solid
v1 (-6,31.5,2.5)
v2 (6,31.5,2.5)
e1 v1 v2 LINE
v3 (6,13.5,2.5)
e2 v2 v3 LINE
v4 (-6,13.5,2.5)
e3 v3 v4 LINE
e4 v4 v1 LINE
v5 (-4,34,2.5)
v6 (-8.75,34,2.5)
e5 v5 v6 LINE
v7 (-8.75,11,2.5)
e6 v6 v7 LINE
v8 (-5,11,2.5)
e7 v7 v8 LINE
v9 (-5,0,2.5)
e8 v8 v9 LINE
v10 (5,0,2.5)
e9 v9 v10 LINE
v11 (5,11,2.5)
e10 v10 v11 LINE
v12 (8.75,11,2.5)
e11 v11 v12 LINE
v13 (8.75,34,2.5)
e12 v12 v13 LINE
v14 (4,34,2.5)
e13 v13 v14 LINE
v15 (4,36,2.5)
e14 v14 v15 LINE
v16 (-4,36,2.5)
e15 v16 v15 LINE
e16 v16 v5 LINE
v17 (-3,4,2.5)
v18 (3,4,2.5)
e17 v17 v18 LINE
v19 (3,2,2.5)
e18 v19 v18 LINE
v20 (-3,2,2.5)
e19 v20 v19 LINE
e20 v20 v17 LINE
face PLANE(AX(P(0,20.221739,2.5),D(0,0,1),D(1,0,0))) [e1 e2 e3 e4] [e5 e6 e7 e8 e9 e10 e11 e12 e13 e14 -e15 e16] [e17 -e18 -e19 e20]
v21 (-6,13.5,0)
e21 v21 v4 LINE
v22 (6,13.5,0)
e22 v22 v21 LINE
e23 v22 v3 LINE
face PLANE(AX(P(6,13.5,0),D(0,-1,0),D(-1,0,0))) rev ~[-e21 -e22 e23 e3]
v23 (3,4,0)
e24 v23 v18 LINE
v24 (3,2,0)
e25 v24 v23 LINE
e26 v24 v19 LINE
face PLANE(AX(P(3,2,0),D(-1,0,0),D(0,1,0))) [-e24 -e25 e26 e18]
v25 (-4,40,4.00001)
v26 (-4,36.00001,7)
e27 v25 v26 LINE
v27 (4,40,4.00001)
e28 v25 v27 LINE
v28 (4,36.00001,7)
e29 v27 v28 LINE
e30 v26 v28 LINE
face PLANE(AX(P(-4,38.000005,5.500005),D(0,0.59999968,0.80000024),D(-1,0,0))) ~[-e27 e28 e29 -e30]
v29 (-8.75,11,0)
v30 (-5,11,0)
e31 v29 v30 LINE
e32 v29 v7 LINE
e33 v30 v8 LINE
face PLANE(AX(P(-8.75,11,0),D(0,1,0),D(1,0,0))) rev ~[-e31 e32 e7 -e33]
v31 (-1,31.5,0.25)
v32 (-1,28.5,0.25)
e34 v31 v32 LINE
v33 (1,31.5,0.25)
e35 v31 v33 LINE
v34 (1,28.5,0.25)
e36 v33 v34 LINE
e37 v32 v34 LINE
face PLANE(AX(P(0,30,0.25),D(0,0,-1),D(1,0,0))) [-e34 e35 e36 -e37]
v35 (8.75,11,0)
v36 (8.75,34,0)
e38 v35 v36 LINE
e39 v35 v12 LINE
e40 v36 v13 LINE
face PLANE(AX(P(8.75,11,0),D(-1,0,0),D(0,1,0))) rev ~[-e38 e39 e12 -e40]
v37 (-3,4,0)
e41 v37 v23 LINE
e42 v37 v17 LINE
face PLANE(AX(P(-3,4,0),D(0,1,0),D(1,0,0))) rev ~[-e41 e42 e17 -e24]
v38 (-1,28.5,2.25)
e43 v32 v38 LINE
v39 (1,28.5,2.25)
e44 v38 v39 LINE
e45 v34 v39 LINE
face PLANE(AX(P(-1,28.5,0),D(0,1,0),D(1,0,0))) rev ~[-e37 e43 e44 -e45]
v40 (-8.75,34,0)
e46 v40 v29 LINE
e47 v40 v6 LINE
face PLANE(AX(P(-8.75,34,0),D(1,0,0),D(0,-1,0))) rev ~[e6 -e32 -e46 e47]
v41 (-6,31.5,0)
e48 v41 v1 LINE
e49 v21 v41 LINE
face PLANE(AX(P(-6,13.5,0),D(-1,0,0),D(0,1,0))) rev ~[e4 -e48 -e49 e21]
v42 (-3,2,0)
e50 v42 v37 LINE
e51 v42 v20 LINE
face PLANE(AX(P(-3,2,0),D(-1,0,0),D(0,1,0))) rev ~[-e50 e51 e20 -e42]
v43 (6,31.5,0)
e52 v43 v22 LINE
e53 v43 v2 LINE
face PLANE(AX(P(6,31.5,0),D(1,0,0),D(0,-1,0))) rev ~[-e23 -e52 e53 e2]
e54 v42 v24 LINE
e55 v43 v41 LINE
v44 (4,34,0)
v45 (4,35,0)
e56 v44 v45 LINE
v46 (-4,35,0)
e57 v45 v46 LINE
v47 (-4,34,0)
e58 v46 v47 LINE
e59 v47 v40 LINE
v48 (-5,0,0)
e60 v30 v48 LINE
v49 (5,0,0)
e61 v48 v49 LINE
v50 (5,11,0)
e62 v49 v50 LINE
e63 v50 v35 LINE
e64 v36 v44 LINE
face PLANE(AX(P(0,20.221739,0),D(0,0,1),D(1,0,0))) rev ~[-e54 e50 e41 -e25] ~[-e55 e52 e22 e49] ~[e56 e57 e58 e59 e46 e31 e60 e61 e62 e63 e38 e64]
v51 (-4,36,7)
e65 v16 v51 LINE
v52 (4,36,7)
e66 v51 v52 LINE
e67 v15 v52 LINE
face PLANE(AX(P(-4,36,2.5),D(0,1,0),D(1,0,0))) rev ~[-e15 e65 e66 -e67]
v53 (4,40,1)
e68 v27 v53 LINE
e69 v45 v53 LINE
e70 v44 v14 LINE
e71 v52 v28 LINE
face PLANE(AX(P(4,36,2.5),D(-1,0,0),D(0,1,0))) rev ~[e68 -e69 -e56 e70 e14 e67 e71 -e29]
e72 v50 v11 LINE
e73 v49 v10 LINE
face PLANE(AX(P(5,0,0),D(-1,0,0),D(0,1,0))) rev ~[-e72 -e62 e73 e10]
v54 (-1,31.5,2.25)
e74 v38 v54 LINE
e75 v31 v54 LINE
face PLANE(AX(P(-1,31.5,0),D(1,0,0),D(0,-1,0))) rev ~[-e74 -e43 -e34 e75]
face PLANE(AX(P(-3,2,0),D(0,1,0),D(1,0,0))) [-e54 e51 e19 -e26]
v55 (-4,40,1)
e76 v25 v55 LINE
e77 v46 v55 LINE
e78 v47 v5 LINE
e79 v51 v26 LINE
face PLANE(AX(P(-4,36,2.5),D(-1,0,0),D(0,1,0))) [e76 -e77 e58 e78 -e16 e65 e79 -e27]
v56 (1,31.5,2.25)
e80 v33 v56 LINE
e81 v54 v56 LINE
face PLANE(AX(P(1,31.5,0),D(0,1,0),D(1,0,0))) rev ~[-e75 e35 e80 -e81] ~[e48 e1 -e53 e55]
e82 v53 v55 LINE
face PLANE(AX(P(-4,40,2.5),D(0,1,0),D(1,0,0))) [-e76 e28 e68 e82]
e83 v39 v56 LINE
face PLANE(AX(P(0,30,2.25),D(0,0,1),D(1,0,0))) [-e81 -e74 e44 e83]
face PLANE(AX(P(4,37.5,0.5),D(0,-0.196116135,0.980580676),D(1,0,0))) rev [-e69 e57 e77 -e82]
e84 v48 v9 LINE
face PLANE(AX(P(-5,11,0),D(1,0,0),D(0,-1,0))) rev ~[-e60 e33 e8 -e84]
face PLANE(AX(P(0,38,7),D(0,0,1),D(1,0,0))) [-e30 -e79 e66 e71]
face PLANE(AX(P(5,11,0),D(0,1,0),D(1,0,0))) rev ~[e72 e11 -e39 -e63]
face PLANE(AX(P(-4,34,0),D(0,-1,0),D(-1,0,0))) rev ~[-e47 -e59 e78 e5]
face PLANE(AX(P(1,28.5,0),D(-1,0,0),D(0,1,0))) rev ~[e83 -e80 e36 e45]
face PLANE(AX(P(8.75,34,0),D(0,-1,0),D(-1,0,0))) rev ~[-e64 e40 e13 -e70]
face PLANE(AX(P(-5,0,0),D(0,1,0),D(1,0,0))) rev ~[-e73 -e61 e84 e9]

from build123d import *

# Parameters (mm, degrees)
F0_W     = 6
F0_H     = 2
F1_DEPTH = 2.5
F2_W     = 8
F2_H     = 4
F3_DEPTH = 4.5
F4_SIZE2 = 3.99999
F4_SIZE  = 2.99999
F5_SIZE2 = 1
F5_SIZE  = 5
F6_W     = 2
F6_H     = 3
F7_DEPTH = 0.25
F8_W     = 2
F8_H     = 3
F9_DEPTH = 0.25


# Not quite as in the source:
# - a fillet or chamfer is up to 0.001 mm smaller than in the source, because OpenCascade refuses the exact size


with BuildPart() as f1:
    # F0 (on Top) → F1 (new body)
    with BuildSketch(Plane.XY):
        Polygon((-5, 11), (-5, 0), (5, 0), (5, 11), (8.75, 11), (8.75, 34), (4, 34), (4, 40), (-4, 40), (-4, 34), (-8.75, 34), (-8.75, 11), align=None)
        with Locations((0, 3)):
            Rectangle(F0_W, F0_H, mode=Mode.SUBTRACT)
        Polygon((-6, 13.5), (-6, 31.5), (-1, 31.5), (-1, 28.5), (1, 28.5), (1, 31.5), (6, 31.5), (6, 13.5), align=None, mode=Mode.SUBTRACT)
    extrude(amount=F1_DEPTH)

    # F2 (on face) → F3 (join)
    with BuildSketch(Plane.XY.offset(2.5)):
        with Locations((0, 38)):
            Rectangle(F2_W, F2_H)
    extrude(amount=F3_DEPTH)

    # F4 (size 3 and 4 in the source; OpenCascade refuses exactly that, so slightly less here)
    f4_edges = [f1.edges().sort_by_distance(p)[0] for p in [
        (0, 40, 7),
    ]]
    f4_side = f1.faces().sort_by_distance((0, 40, 3.5))[0]
    chamfer(f4_edges, length=F4_SIZE, length2=F4_SIZE2, reference=f4_side)

    # F5
    f5_edges = [f1.edges().sort_by_distance(p)[0] for p in [
        (0, 40, 0),
    ]]
    f5_side = f1.faces().sort_by_distance((-4.563394, 5.5, 0))[0]
    chamfer(f5_edges, length=F5_SIZE, length2=F5_SIZE2, reference=f5_side)

    # F6 (on face) → F7 (cut)
    with BuildSketch(Plane.XY.offset(2.5)):
        with Locations((0, 30)):
            Rectangle(F6_W, F6_H)
    extrude(amount=-F7_DEPTH, mode=Mode.SUBTRACT)

    # F8 (on face) → F9 (cut)
    with BuildSketch(Plane(origin=(0, 0, 0), x_dir=(1, 0, 0), z_dir=(0, 0, -1))):
        with Locations((0, -30)):
            Rectangle(F8_W, F8_H)
    extrude(amount=-F9_DEPTH, mode=Mode.SUBTRACT)


solid = f1.part
